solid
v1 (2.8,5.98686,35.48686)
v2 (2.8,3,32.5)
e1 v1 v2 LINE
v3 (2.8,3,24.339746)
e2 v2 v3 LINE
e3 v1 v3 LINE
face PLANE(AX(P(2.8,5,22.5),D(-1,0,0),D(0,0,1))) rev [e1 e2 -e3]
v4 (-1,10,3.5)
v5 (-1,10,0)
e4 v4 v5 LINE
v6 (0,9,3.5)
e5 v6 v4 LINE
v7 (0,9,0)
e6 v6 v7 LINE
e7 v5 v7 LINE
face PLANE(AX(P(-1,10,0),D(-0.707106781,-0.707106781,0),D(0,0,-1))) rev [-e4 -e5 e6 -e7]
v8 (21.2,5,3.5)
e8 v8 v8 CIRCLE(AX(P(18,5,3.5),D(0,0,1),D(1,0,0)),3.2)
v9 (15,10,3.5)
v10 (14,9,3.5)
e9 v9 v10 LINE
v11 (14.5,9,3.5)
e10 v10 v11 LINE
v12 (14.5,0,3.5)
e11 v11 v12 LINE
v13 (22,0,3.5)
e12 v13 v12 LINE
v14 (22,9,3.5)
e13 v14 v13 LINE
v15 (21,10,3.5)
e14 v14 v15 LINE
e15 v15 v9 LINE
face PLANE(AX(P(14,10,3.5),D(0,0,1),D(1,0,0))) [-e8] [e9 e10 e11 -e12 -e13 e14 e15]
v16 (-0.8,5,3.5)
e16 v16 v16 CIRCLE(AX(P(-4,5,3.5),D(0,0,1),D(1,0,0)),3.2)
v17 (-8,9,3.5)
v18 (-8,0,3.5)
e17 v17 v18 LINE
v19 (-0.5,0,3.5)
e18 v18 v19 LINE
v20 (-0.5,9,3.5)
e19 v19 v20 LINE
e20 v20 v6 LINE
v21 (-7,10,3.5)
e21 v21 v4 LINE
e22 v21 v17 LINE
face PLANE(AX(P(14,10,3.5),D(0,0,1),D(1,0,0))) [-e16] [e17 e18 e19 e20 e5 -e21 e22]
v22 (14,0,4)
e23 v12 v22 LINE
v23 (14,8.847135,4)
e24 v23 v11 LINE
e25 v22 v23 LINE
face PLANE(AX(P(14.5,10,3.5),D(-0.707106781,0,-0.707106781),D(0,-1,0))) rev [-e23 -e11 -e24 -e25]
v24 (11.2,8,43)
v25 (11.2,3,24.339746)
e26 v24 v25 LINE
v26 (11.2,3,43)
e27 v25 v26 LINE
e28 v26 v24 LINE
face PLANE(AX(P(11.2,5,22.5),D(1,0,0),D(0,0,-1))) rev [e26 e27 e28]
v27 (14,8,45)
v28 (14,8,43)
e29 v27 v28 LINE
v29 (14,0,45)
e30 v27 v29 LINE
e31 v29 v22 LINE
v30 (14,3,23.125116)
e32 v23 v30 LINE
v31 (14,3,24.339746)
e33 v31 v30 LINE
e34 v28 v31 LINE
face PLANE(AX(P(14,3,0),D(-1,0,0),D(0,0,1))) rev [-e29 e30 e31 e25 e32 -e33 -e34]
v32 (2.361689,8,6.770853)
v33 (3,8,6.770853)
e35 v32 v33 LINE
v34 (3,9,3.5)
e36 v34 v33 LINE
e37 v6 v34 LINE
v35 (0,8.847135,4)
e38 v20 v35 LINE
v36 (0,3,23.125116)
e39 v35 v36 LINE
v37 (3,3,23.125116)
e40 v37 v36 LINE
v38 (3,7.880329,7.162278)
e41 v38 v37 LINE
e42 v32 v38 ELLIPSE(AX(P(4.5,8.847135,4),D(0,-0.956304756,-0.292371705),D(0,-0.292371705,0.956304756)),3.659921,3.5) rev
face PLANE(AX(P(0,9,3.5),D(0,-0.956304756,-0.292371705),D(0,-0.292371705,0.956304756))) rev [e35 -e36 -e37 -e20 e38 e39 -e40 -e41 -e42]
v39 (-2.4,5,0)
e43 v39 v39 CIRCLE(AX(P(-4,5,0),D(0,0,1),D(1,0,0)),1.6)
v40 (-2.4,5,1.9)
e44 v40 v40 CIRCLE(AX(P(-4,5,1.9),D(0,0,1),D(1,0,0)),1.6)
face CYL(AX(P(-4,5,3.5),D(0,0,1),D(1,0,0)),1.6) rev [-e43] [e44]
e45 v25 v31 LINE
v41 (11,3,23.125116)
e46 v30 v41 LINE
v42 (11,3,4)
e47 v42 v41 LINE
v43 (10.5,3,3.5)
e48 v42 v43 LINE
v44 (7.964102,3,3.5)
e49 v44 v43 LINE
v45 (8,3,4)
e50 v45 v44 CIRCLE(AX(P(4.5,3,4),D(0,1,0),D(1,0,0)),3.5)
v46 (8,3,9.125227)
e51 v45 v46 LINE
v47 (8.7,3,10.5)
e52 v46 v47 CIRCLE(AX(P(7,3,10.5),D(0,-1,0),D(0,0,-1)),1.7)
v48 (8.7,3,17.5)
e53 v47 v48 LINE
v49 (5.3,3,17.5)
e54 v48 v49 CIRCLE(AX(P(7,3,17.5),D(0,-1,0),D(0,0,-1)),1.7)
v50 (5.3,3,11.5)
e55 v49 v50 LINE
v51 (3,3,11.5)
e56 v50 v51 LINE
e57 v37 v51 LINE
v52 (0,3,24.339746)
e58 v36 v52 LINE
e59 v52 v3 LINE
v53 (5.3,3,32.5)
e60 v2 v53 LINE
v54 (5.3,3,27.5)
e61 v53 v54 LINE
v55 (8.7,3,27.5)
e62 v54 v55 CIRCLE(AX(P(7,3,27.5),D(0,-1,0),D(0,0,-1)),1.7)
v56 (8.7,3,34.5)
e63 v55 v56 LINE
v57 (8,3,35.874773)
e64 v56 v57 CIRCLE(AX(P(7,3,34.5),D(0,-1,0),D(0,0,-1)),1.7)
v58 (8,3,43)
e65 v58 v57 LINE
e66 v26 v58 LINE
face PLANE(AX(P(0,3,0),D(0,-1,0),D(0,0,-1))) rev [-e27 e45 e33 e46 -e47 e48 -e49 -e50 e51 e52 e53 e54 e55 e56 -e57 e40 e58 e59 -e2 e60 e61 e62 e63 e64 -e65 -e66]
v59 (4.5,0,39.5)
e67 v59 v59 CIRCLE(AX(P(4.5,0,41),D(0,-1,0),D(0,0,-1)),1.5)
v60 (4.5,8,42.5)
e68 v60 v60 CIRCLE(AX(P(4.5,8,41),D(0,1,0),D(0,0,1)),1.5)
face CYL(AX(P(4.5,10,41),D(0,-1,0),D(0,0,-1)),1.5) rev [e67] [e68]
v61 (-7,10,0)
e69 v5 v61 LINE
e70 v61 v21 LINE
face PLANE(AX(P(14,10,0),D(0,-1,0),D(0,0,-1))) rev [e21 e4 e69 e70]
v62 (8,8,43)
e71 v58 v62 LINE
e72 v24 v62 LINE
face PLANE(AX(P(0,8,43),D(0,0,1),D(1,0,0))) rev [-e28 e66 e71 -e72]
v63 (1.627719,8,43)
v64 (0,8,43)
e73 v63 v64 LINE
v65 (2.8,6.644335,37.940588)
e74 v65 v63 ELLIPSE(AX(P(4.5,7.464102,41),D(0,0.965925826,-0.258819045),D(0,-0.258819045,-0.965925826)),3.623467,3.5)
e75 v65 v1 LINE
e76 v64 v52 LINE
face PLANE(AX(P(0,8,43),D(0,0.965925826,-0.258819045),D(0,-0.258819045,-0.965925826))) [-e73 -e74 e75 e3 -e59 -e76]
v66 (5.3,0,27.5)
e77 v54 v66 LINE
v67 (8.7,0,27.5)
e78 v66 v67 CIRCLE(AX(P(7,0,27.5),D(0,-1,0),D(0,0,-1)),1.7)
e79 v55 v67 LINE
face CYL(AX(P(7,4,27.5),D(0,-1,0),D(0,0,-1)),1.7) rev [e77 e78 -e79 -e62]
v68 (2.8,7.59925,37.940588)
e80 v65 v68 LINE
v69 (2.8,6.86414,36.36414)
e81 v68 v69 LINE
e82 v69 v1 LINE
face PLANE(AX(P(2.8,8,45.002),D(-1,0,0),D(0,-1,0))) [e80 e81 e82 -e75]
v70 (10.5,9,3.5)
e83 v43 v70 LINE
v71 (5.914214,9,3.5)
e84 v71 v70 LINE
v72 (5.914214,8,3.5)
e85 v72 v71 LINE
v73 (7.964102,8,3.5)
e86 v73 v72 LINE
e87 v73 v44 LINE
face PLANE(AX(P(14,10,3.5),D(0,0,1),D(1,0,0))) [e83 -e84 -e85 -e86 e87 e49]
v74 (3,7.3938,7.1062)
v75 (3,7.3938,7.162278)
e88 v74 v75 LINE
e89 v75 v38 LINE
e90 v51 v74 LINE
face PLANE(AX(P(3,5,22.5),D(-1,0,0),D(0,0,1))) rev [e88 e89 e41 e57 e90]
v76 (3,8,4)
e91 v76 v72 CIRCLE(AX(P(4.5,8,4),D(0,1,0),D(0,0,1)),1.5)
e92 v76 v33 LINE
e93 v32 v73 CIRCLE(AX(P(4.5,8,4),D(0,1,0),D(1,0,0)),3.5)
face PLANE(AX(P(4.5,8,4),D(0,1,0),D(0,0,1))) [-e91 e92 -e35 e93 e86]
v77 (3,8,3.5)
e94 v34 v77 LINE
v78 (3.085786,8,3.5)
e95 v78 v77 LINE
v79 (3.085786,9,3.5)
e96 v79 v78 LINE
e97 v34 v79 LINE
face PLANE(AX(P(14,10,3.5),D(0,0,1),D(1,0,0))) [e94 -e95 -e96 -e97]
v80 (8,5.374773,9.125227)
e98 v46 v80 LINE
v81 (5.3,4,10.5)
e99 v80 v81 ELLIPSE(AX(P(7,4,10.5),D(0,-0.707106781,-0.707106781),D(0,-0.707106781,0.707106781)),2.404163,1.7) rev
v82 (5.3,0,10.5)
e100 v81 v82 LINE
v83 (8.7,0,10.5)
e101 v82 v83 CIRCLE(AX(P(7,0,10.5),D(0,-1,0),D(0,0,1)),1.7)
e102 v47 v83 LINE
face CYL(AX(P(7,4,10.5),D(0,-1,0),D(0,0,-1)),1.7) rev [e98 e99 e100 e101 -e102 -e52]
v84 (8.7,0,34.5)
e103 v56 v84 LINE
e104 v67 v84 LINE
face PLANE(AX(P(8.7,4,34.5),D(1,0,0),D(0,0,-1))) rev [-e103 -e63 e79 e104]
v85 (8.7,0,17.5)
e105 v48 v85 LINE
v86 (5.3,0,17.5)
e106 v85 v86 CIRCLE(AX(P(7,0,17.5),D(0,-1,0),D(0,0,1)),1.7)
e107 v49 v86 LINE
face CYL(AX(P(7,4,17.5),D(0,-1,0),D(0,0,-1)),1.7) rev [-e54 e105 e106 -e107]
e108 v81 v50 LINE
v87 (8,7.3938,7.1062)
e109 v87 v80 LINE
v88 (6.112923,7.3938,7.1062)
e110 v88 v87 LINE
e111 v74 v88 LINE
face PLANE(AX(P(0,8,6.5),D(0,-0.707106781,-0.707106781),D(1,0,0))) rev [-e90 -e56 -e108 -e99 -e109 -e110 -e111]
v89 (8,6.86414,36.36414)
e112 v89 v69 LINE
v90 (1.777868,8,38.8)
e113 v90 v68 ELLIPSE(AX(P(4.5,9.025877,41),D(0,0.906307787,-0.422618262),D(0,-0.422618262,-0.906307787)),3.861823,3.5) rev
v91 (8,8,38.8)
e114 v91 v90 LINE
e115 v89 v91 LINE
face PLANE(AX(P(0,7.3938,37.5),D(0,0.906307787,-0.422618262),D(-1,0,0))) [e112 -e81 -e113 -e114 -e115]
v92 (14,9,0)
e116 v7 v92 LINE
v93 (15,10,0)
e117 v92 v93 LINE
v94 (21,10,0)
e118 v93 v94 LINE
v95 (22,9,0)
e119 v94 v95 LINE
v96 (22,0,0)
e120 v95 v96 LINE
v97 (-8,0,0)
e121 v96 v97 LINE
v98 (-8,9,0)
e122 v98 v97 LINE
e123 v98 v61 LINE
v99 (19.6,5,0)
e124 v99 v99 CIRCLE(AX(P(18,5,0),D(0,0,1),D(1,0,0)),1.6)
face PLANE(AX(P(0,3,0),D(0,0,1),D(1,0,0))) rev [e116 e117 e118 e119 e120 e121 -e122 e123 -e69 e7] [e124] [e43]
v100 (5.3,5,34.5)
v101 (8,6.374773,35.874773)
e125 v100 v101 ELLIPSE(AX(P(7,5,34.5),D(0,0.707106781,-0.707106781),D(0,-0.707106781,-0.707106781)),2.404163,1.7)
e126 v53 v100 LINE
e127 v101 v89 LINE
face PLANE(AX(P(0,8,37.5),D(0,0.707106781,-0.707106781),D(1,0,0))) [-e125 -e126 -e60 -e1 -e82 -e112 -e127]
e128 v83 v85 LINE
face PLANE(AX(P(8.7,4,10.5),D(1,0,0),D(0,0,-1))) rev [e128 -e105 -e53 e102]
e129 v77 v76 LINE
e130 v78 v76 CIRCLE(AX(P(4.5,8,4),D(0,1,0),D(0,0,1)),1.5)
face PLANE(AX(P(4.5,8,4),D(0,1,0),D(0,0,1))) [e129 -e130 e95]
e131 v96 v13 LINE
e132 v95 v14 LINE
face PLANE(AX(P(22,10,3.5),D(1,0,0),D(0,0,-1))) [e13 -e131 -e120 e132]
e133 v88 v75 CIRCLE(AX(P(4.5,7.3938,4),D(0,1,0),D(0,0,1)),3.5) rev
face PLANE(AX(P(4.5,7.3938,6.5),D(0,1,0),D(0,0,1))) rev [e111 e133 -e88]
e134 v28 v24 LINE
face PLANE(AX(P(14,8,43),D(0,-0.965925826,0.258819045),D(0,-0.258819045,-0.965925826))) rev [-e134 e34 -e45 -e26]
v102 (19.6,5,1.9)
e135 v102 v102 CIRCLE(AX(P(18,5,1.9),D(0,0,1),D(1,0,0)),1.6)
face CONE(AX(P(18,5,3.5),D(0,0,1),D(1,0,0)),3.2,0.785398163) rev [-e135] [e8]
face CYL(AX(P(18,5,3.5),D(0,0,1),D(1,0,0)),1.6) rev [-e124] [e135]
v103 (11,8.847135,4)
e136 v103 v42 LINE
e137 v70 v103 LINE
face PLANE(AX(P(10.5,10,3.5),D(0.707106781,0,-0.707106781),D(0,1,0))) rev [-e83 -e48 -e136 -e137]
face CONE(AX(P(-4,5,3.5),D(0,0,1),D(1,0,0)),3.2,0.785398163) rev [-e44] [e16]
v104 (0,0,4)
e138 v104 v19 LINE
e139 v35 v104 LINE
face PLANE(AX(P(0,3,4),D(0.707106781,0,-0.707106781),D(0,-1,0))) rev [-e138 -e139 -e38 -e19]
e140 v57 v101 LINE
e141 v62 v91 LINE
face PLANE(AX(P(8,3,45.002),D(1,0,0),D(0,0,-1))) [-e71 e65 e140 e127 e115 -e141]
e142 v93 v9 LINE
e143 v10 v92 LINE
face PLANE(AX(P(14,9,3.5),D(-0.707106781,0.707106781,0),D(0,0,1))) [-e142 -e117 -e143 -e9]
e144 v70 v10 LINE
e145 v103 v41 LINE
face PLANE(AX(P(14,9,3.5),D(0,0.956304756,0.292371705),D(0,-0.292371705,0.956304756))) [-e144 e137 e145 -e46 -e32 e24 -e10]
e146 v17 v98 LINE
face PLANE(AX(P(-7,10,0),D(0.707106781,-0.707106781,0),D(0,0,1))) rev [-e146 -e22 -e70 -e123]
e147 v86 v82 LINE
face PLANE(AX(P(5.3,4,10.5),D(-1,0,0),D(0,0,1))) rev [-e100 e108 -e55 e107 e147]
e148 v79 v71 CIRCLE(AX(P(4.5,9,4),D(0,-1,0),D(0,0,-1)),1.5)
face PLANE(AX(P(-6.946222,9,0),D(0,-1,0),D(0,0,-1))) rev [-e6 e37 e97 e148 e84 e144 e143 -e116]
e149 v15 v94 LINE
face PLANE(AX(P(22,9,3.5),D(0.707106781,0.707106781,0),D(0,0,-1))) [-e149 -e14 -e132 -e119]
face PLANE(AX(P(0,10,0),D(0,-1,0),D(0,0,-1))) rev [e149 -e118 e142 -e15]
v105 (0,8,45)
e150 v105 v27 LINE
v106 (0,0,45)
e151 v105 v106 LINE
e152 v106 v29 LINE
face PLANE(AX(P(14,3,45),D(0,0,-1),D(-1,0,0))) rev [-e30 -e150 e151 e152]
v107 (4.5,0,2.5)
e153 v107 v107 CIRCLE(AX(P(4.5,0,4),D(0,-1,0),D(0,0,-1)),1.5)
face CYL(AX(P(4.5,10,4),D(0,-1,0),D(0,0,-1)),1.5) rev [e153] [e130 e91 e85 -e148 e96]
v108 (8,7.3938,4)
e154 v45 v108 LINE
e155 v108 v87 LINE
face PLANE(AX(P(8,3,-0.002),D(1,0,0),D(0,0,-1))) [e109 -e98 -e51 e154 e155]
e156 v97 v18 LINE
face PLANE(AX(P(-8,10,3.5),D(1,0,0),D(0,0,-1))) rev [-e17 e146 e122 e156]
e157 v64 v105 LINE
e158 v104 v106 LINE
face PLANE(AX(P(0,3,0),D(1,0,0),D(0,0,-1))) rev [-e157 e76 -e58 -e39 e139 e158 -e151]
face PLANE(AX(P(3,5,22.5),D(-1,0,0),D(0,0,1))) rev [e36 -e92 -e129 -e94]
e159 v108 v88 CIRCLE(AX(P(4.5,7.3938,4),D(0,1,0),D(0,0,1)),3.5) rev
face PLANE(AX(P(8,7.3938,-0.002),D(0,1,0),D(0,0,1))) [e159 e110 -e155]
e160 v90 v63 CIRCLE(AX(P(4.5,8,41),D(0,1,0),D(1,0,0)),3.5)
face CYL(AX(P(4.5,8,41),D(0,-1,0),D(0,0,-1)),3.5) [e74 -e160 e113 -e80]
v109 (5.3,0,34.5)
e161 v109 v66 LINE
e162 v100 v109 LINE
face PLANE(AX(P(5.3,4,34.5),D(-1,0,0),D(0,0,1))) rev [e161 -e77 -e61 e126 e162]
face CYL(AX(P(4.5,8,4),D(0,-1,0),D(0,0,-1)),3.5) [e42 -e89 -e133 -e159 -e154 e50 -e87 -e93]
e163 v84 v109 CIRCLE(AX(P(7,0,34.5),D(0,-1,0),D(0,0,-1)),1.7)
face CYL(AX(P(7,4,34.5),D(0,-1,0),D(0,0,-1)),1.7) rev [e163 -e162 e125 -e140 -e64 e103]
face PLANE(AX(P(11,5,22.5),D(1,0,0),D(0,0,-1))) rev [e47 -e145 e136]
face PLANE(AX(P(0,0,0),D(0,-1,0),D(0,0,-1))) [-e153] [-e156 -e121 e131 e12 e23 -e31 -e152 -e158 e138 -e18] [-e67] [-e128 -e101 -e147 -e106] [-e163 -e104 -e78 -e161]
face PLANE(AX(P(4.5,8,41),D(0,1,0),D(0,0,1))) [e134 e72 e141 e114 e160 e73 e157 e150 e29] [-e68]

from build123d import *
from build123d.topology import SkipClean

# Parameters (mm, degrees)
SKETCH_1_W               = 14
SKETCH_1_H               = 45
EXTRUDE_1_DEPTH          = 3
SKETCH_4_W               = 8
SKETCH_4_H               = 3.5
EXTRUDE_2_DEPTH          = 10
SKETCH_10_W              = 3.5
SKETCH_10_H              = 6
EXTRUDE_3_DEPTH          = 14
CUT_EXTRUDE_1_DEPTH      = 52.078371156
CUT_EXTRUDE_1_DEPTH_BACK = 52.078371156
SKETCH_2_R               = 1.5
SKETCH_3_R               = 3.5
SKETCH_3_R_2             = 1.5
EXTRUDE_1_2_DEPTH        = 5
SKETCH_12_W              = 14
SKETCH_12_H              = 2
EXTRUDE_4_DEPTH          = 5
RIB_9_REACH              = 53.078
SKETCH_13_WALL_W         = 123.475258838
SKETCH_13_WALL_H         = 2.8
RIB_8_REACH              = 53.078
SKETCH_11_WALL_W         = 124.678564032
SKETCH_11_WALL_H         = 3
CHAMFER_3_SIZE           = 0.5
CHAMFER_4_SIZE           = 1
EXTRUDE_5_REACH          = 46.612
EXTRUDE_5_END_RADIUS     = 3.5
SKETCH_15_W              = 5.2
SKETCH_15_H              = 5
CHAMFER_5_SIZE           = 0.606199956
CHAMFER_5_SIZE_2         = 1.3
CUT_EXTRUDE_2_DEPTH      = 4
EXTRUDE_START            = 3
EXTRUDE_6_DEPTH          = 4.393800044
CUT_EXTRUDE_3_DEPTH      = 1
CHAMFER_START            = 2.8
CHAMFER_6_DEPTH          = 2.5
CHAMFER_START_2          = 5.3
CHAMFER_6_2_DEPTH        = 2.7
CHAMFER_START_3          = 3
CHAMFER_6_3_DEPTH        = 3.7
DELETE_START             = 2
DELETE_FACE_1_DEPTH      = 6


with BuildPart() as part:
    # 草图1 → Extrude 1 (new body)
    with BuildSketch(Plane(origin=(0, 0, 0), x_dir=(1, 0, 0), z_dir=(0, 1, 0))):
        with Locations((7, -22.5)):
            Rectangle(SKETCH_1_W, SKETCH_1_H)
    extrude(amount=EXTRUDE_1_DEPTH)

    # 草图4 → 凸台-拉伸2 (add)
    with BuildSketch(Plane.XZ):
        with Locations((18, 1.75)):
            Rectangle(SKETCH_4_W, SKETCH_4_H)
    extrude_2 = extrude(amount=-EXTRUDE_2_DEPTH)

    # 草图9 → 打孔尺寸(%根据)内六角花形半沉头螺钉的类型1 (revolve, cut)
    with BuildSketch(Plane(origin=(18, 5, 3.5), x_dir=(0, -1, 0), z_dir=(1, 0, 0))):
        Polygon((0, 0), (0, 5.96137699), (1.6, 5), (1.6, 1.6), (3.2, 0), align=None)
    hole_wizard_1 = revolve(axis=Axis((18, 5, 9.85), (0, 0, -1)), mode=Mode.SUBTRACT)

    # 镜向1: 凸台-拉伸2, 打孔尺寸(%根据)内六角花形半沉头螺钉的类型1 across plane
    add(extrude_2.mirror(Plane(origin=(7, 0, 0), x_dir=(0, 0, 1), z_dir=(1, 0, 0))))
    add(hole_wizard_1.mirror(Plane(origin=(7, 0, 0), x_dir=(0, 0, 1), z_dir=(1, 0, 0))), mode=Mode.SUBTRACT)

    # 草图10 → 凸台-拉伸3 (add)
    with BuildSketch(Plane.ZY.offset(-14)):
        with Locations((1.75, 6)):
            Rectangle(SKETCH_10_W, SKETCH_10_H)
    extrude(amount=EXTRUDE_3_DEPTH)

    # 草图2 → 切除-拉伸1 (cut, two sides: drawn at the far end of the back side and taken through both)
    with BuildSketch(Plane.XZ.offset(-CUT_EXTRUDE_1_DEPTH_BACK)):
        with Locations(Location((4.5, 41, 0), (0, 0, 270))):
            Circle(SKETCH_2_R)
        with Locations(Location((4.5, 4, 0), (0, 0, 270))):
            Circle(SKETCH_2_R)
    extrude(amount=CUT_EXTRUDE_1_DEPTH + CUT_EXTRUDE_1_DEPTH_BACK, mode=Mode.SUBTRACT)

    # 草图3 → Extrude 1 2 (add)
    # profile 1 of 2: a face of its own
    with SkipClean():  # the faces are left unmerged after this step: merging them gives an invalid solid
        with BuildSketch(Plane(origin=(0, 3, 0), x_dir=(1, 0, 0), z_dir=(0, 1, 0))):
            with Locations((4.5, -41)):
                Circle(SKETCH_3_R)
            with Locations((4.5, -41)):
                Circle(SKETCH_3_R_2, mode=Mode.SUBTRACT)
        # profile 2 of 2: a face of its own
        with BuildSketch(Plane(origin=(0, 3, 0), x_dir=(1, 0, 0), z_dir=(0, 1, 0))):
            with Locations((4.5, -4)):
                Circle(SKETCH_3_R)
            with Locations((4.5, -4)):
                Circle(SKETCH_3_R_2, mode=Mode.SUBTRACT)
        extrude(amount=EXTRUDE_1_2_DEPTH)

    # 草图12 → 凸台-拉伸4 (add)
    with SkipClean():  # the faces are left unmerged after this step: merging them gives an invalid solid
        with BuildSketch(Plane(origin=(0, 3, 0), x_dir=(1, 0, 0), z_dir=(0, 1, 0))):
            with Locations((7, -44)):
                Rectangle(SKETCH_12_W, SKETCH_12_H)
        extrude(amount=EXTRUDE_4_DEPTH)

    # 草图13 wall → 筋9 (add, up to next)
    with BuildSketch(Plane(origin=(14, 5.5, 33.669872981), x_dir=(0, -0.258819045101, -0.96592582629), z_dir=(0, 0.96592582629, -0.258819045101)), mode=Mode.PRIVATE) as rib_9_sk1:
        with Locations((0, 1.4)):
            Rectangle(SKETCH_13_WALL_W, SKETCH_13_WALL_H)
    rib_9_tool1 = extrude(rib_9_sk1.sketch, amount=-RIB_9_REACH, mode=Mode.PRIVATE) - part.part
    rib_9 = rib_9_tool1.solids().sort_by_distance((14, 5.5, 33.669872981))[0]
    add(rib_9)

    # 草图11 wall → 筋8 (add, up to next)
    with BuildSketch(Plane(origin=(14, 6, 13.312557855), x_dir=(0, -0.292371704721, 0.956304755963), z_dir=(0, -0.956304755963, -0.292371704721)), mode=Mode.PRIVATE) as rib_8_sk1:
        with Locations((0, 1.5)):
            Rectangle(SKETCH_11_WALL_W, SKETCH_11_WALL_H)
    rib_8_tool1 = extrude(rib_8_sk1.sketch, amount=RIB_8_REACH, mode=Mode.PRIVATE) - part.part
    rib_8 = rib_8_tool1.solids().sort_by_distance((14, 6, 13.312557855))[0]
    add(rib_8)

    # 镜向2: 筋9, 筋8 across plane
    with SkipClean():  # the faces are left unmerged after this step: merging them gives an invalid solid
        add(rib_9.mirror(Plane(origin=(7, 0, 0), x_dir=(0, 0, 1), z_dir=(1, 0, 0))))
        add(rib_8.mirror(Plane(origin=(7, 0, 0), x_dir=(0, 0, 1), z_dir=(1, 0, 0))))

    # 倒角3
    # the kernel refuses this chamfer: 0.5 mm, written as the material it adds along each edge
    with BuildSketch(Plane(origin=(14, 3, 3.5), x_dir=(1, 0, 0), z_dir=(0, 1, 0))) as chamfer_3_piece_1_section:
        Polygon((CHAMFER_3_SIZE, 0), (0, -CHAMFER_3_SIZE), (0, 0), align=None)
    chamfer_3_piece_1 = extrude(amount=7.285841494, mode=Mode.PRIVATE)
    chamfer_3_piece_1 = split(chamfer_3_piece_1, bisect_by=Plane(origin=(14, 8.487112718, 5.17757871), z_dir=(0, -0.956304755963518, -0.29237170472115837)), keep=Keep.TOP, mode=Mode.PRIVATE)
    add(chamfer_3_piece_1)
    with BuildSketch(Plane(origin=(11, 10.285841494, 3.5), x_dir=(-1, 0, 0), z_dir=(0, -1, 0))) as chamfer_3_piece_2_section:
        Polygon((CHAMFER_3_SIZE, 0), (0, -CHAMFER_3_SIZE), (0, 0), align=None)
    chamfer_3_piece_2 = extrude(amount=8.571682988, mode=Mode.PRIVATE)
    chamfer_3_piece_2 = split(chamfer_3_piece_2, bisect_by=Plane(origin=(11, 9.109915291, 3.140483281), z_dir=(0, -0.956304755963518, -0.29237170472115837)), keep=Keep.TOP, mode=Mode.PRIVATE)
    add(chamfer_3_piece_2)
    with BuildSketch(Plane(origin=(0, 3, 3.5), x_dir=(0, 0, 1), z_dir=(0, 1, 0))) as chamfer_3_piece_3_section:
        Polygon((CHAMFER_3_SIZE, 0), (0, -CHAMFER_3_SIZE), (0, 0), align=None)
    chamfer_3_piece_3 = extrude(amount=7.285841494, mode=Mode.PRIVATE)
    chamfer_3_piece_3 = split(chamfer_3_piece_3, bisect_by=Plane(origin=(0, 8.487112718, 5.17757871), z_dir=(0, -0.956304755963518, -0.29237170472115837)), keep=Keep.TOP, mode=Mode.PRIVATE)
    add(chamfer_3_piece_3)
    with BuildSketch(Plane(origin=(0, 0, 3.5), x_dir=(0, 0, 1), z_dir=(0, 1, 0))) as chamfer_3_piece_4:
        Polygon((CHAMFER_3_SIZE, 0), (0, -CHAMFER_3_SIZE), (0, 0), align=None)
    extrude(amount=3)
    with BuildSketch(Plane(origin=(14, 0, 3.5), x_dir=(0, 0, 1), z_dir=(0, 1, 0))) as chamfer_3_piece_5:
        Polygon((CHAMFER_3_SIZE, 0), (0, CHAMFER_3_SIZE), (0, 0), align=None)
    extrude(amount=3)

    # 倒角4
    chamfer_4_edges = [part.edges().sort_by_distance(p)[0] for p in [
        (-8, 10, 1.75),
        (0, 10, 1.75),
        (14, 10, 1.75),
        (22, 10, 1.75),
    ]]
    chamfer(chamfer_4_edges, length=CHAMFER_4_SIZE - 0.0001)  # a hair under: the kernel refuses the full size

    # 凸台-拉伸5: up to this cylinder (the profile starts outside it)
    extrude_5_end = Plane(origin=(4.5, 5.5, 41), z_dir=(0, -1, 0)) * Cylinder(EXTRUDE_5_END_RADIUS, 101.224, mode=Mode.PRIVATE)
    # 草图15 → 凸台-拉伸5 (add, up to the surface)
    with BuildSketch(Plane(origin=(0, 0, 37.5), x_dir=(-1, 0, 0), z_dir=(0, 0, -1)), mode=Mode.PRIVATE) as extrude_5_sk1:
        with Locations((-5.4, 5.5)):
            Rectangle(SKETCH_15_W, SKETCH_15_H)
    extrude_5_tool1 = extrude(extrude_5_sk1.sketch, amount=-EXTRUDE_5_REACH, mode=Mode.PRIVATE) - extrude_5_end
    add(extrude_5_tool1.solids().sort_by_distance((5.4, 5.5, 37.5))[0])
    add(extrude_5_tool1.solids().sort_by_distance((5.4, 5.5, 37.5))[1])

    # 倒角5
    # the kernel refuses this chamfer: 1.3, 0.606199956 mm, written as the material it takes off along each edge
    with BuildSketch(Plane(origin=(4.5, 8, 37.5), x_dir=(0, -1, 0), z_dir=(1, 0, 0))) as chamfer_5_piece_1:
        Polygon((CHAMFER_5_SIZE, 0), (0, -CHAMFER_5_SIZE_2), (0, 0), align=None)
    extrude(amount=6.868268113, mode=Mode.SUBTRACT)
    with BuildSketch(Plane(origin=(-0.568268113, 8, 37.5), x_dir=(0, -1, 0), z_dir=(1, 0, 0))) as chamfer_5_piece_2:
        Polygon((CHAMFER_5_SIZE, 0), (0, -CHAMFER_5_SIZE_2), (0, 0), align=None)
    extrude(amount=5.068268113, mode=Mode.SUBTRACT)

    # 草图14 → 切除-拉伸2 (cut)
    with BuildSketch(Plane.XZ):
        with BuildLine():
            Line((8.7, 34.5), (8.7, 27.5))
            ThreePointArc((8.7, 27.5), (7, 25.8), (5.3, 27.5))
            Line((5.3, 27.5), (5.3, 34.5))
            ThreePointArc((5.3, 34.5), (7, 36.2), (8.7, 34.5))
        make_face()
        with BuildLine():
            Line((8.7, 10.5), (8.7, 17.5))
            ThreePointArc((8.7, 17.5), (7, 19.2), (5.3, 17.5))
            Line((5.3, 17.5), (5.3, 10.5))
            ThreePointArc((5.3, 10.5), (7, 8.8), (8.7, 10.5))
        make_face()
    extrude(amount=-CUT_EXTRUDE_2_DEPTH, mode=Mode.SUBTRACT)

    # 凸台-拉伸6: read off the stored shape, not the designer's step
    # 凸台-拉伸6 outline → 凸台-拉伸6 (add)
    with BuildSketch(Plane(origin=(0, 0, 0), x_dir=(1, 0, 0), z_dir=(0, 1, 0)).offset(EXTRUDE_START)):
        with BuildLine():
            Line((4.5, -7.5), (8, -7.5))
            Line((8, -7.5), (8, -4))
            ThreePointArc((8, -4), (6.974873734, -6.474873734), (4.5, -7.5))
        make_face()
        with BuildLine():
            Line((3, -7.5), (4.5, -7.5))
            ThreePointArc((4.5, -7.5), (3.731225589, -7.414525722), (3, -7.16227766))
            Line((3, -7.16227766), (3, -7.5))
        make_face()
    extrude(amount=EXTRUDE_6_DEPTH)

    # 草图21 → 切除-拉伸3 (cut)
    with BuildSketch(Plane.XY.offset(7.5)):
        Polygon((3, 7.393800044), (3, 3), (8, 3), (8, 7.393800044), (4.5, 7.393800044), align=None)
    extrude(amount=-CUT_EXTRUDE_3_DEPTH, mode=Mode.SUBTRACT)

    # 倒角6: read off the stored shape, not the designer's step
    # 倒角6 outline → 倒角6 (add)
    with BuildSketch(Plane.YZ.offset(CHAMFER_START)):
        Polygon((3, 6.5), (7.393800044, 6.5), (7.393800044, 7.106199956), (3, 11.5), align=None)
        Polygon((3, 37.5), (3, 32.5), (6.864139677, 36.364139677), (7.393800044, 37.5), align=None)
    extrude(amount=CHAMFER_6_DEPTH)

    # Chamfer 6 2 outline → Chamfer 6 2 (add)
    with BuildSketch(Plane.YZ.offset(CHAMFER_START_2)):
        Polygon((3, 6.5), (7.393800044, 6.5), (7.393800044, 7.106199956), (3, 11.5), align=None)
        Polygon((3, 37.5), (3, 32.5), (6.864139677, 36.364139677), (7.393800044, 37.5), align=None)
    extrude(amount=CHAMFER_6_2_DEPTH)

    # Chamfer 6 3 outline → Chamfer 6 3 (cut)
    with BuildSketch(Plane(origin=(0, 0, 0), x_dir=(1, 0, 0), z_dir=(0, 1, 0)).offset(CHAMFER_START_3)):
        with BuildLine():
            ThreePointArc((8, -9.125227292), (6.228637569, -8.985074259), (5.3, -10.5))
            Line((5.3, -10.5), (5.3, -34.5))
            ThreePointArc((5.3, -34.5), (6.228637569, -36.014925741), (8, -35.874772708))
            Line((8, -35.874772708), (8, -9.125227292))
        make_face()
    extrude(amount=CHAMFER_6_3_DEPTH, mode=Mode.SUBTRACT)

    # Delete Face 1: read off the stored shape, not the designer's step
    # Delete Face 1 outline → Delete Face 1 (add)
    with BuildSketch(Plane(origin=(0, 0, 0), x_dir=(1, 0, 0), z_dir=(0, 1, 0)).offset(DELETE_START)):
        with BuildLine():
            Line((7.372281323, -43), (8, -43))
            Line((8, -43), (8, -41))
            ThreePointArc((8, -41), (7.839385021, -42.048097173), (7.372281323, -43))
        make_face()
    extrude(amount=DELETE_FACE_1_DEPTH)


solid = part.part
